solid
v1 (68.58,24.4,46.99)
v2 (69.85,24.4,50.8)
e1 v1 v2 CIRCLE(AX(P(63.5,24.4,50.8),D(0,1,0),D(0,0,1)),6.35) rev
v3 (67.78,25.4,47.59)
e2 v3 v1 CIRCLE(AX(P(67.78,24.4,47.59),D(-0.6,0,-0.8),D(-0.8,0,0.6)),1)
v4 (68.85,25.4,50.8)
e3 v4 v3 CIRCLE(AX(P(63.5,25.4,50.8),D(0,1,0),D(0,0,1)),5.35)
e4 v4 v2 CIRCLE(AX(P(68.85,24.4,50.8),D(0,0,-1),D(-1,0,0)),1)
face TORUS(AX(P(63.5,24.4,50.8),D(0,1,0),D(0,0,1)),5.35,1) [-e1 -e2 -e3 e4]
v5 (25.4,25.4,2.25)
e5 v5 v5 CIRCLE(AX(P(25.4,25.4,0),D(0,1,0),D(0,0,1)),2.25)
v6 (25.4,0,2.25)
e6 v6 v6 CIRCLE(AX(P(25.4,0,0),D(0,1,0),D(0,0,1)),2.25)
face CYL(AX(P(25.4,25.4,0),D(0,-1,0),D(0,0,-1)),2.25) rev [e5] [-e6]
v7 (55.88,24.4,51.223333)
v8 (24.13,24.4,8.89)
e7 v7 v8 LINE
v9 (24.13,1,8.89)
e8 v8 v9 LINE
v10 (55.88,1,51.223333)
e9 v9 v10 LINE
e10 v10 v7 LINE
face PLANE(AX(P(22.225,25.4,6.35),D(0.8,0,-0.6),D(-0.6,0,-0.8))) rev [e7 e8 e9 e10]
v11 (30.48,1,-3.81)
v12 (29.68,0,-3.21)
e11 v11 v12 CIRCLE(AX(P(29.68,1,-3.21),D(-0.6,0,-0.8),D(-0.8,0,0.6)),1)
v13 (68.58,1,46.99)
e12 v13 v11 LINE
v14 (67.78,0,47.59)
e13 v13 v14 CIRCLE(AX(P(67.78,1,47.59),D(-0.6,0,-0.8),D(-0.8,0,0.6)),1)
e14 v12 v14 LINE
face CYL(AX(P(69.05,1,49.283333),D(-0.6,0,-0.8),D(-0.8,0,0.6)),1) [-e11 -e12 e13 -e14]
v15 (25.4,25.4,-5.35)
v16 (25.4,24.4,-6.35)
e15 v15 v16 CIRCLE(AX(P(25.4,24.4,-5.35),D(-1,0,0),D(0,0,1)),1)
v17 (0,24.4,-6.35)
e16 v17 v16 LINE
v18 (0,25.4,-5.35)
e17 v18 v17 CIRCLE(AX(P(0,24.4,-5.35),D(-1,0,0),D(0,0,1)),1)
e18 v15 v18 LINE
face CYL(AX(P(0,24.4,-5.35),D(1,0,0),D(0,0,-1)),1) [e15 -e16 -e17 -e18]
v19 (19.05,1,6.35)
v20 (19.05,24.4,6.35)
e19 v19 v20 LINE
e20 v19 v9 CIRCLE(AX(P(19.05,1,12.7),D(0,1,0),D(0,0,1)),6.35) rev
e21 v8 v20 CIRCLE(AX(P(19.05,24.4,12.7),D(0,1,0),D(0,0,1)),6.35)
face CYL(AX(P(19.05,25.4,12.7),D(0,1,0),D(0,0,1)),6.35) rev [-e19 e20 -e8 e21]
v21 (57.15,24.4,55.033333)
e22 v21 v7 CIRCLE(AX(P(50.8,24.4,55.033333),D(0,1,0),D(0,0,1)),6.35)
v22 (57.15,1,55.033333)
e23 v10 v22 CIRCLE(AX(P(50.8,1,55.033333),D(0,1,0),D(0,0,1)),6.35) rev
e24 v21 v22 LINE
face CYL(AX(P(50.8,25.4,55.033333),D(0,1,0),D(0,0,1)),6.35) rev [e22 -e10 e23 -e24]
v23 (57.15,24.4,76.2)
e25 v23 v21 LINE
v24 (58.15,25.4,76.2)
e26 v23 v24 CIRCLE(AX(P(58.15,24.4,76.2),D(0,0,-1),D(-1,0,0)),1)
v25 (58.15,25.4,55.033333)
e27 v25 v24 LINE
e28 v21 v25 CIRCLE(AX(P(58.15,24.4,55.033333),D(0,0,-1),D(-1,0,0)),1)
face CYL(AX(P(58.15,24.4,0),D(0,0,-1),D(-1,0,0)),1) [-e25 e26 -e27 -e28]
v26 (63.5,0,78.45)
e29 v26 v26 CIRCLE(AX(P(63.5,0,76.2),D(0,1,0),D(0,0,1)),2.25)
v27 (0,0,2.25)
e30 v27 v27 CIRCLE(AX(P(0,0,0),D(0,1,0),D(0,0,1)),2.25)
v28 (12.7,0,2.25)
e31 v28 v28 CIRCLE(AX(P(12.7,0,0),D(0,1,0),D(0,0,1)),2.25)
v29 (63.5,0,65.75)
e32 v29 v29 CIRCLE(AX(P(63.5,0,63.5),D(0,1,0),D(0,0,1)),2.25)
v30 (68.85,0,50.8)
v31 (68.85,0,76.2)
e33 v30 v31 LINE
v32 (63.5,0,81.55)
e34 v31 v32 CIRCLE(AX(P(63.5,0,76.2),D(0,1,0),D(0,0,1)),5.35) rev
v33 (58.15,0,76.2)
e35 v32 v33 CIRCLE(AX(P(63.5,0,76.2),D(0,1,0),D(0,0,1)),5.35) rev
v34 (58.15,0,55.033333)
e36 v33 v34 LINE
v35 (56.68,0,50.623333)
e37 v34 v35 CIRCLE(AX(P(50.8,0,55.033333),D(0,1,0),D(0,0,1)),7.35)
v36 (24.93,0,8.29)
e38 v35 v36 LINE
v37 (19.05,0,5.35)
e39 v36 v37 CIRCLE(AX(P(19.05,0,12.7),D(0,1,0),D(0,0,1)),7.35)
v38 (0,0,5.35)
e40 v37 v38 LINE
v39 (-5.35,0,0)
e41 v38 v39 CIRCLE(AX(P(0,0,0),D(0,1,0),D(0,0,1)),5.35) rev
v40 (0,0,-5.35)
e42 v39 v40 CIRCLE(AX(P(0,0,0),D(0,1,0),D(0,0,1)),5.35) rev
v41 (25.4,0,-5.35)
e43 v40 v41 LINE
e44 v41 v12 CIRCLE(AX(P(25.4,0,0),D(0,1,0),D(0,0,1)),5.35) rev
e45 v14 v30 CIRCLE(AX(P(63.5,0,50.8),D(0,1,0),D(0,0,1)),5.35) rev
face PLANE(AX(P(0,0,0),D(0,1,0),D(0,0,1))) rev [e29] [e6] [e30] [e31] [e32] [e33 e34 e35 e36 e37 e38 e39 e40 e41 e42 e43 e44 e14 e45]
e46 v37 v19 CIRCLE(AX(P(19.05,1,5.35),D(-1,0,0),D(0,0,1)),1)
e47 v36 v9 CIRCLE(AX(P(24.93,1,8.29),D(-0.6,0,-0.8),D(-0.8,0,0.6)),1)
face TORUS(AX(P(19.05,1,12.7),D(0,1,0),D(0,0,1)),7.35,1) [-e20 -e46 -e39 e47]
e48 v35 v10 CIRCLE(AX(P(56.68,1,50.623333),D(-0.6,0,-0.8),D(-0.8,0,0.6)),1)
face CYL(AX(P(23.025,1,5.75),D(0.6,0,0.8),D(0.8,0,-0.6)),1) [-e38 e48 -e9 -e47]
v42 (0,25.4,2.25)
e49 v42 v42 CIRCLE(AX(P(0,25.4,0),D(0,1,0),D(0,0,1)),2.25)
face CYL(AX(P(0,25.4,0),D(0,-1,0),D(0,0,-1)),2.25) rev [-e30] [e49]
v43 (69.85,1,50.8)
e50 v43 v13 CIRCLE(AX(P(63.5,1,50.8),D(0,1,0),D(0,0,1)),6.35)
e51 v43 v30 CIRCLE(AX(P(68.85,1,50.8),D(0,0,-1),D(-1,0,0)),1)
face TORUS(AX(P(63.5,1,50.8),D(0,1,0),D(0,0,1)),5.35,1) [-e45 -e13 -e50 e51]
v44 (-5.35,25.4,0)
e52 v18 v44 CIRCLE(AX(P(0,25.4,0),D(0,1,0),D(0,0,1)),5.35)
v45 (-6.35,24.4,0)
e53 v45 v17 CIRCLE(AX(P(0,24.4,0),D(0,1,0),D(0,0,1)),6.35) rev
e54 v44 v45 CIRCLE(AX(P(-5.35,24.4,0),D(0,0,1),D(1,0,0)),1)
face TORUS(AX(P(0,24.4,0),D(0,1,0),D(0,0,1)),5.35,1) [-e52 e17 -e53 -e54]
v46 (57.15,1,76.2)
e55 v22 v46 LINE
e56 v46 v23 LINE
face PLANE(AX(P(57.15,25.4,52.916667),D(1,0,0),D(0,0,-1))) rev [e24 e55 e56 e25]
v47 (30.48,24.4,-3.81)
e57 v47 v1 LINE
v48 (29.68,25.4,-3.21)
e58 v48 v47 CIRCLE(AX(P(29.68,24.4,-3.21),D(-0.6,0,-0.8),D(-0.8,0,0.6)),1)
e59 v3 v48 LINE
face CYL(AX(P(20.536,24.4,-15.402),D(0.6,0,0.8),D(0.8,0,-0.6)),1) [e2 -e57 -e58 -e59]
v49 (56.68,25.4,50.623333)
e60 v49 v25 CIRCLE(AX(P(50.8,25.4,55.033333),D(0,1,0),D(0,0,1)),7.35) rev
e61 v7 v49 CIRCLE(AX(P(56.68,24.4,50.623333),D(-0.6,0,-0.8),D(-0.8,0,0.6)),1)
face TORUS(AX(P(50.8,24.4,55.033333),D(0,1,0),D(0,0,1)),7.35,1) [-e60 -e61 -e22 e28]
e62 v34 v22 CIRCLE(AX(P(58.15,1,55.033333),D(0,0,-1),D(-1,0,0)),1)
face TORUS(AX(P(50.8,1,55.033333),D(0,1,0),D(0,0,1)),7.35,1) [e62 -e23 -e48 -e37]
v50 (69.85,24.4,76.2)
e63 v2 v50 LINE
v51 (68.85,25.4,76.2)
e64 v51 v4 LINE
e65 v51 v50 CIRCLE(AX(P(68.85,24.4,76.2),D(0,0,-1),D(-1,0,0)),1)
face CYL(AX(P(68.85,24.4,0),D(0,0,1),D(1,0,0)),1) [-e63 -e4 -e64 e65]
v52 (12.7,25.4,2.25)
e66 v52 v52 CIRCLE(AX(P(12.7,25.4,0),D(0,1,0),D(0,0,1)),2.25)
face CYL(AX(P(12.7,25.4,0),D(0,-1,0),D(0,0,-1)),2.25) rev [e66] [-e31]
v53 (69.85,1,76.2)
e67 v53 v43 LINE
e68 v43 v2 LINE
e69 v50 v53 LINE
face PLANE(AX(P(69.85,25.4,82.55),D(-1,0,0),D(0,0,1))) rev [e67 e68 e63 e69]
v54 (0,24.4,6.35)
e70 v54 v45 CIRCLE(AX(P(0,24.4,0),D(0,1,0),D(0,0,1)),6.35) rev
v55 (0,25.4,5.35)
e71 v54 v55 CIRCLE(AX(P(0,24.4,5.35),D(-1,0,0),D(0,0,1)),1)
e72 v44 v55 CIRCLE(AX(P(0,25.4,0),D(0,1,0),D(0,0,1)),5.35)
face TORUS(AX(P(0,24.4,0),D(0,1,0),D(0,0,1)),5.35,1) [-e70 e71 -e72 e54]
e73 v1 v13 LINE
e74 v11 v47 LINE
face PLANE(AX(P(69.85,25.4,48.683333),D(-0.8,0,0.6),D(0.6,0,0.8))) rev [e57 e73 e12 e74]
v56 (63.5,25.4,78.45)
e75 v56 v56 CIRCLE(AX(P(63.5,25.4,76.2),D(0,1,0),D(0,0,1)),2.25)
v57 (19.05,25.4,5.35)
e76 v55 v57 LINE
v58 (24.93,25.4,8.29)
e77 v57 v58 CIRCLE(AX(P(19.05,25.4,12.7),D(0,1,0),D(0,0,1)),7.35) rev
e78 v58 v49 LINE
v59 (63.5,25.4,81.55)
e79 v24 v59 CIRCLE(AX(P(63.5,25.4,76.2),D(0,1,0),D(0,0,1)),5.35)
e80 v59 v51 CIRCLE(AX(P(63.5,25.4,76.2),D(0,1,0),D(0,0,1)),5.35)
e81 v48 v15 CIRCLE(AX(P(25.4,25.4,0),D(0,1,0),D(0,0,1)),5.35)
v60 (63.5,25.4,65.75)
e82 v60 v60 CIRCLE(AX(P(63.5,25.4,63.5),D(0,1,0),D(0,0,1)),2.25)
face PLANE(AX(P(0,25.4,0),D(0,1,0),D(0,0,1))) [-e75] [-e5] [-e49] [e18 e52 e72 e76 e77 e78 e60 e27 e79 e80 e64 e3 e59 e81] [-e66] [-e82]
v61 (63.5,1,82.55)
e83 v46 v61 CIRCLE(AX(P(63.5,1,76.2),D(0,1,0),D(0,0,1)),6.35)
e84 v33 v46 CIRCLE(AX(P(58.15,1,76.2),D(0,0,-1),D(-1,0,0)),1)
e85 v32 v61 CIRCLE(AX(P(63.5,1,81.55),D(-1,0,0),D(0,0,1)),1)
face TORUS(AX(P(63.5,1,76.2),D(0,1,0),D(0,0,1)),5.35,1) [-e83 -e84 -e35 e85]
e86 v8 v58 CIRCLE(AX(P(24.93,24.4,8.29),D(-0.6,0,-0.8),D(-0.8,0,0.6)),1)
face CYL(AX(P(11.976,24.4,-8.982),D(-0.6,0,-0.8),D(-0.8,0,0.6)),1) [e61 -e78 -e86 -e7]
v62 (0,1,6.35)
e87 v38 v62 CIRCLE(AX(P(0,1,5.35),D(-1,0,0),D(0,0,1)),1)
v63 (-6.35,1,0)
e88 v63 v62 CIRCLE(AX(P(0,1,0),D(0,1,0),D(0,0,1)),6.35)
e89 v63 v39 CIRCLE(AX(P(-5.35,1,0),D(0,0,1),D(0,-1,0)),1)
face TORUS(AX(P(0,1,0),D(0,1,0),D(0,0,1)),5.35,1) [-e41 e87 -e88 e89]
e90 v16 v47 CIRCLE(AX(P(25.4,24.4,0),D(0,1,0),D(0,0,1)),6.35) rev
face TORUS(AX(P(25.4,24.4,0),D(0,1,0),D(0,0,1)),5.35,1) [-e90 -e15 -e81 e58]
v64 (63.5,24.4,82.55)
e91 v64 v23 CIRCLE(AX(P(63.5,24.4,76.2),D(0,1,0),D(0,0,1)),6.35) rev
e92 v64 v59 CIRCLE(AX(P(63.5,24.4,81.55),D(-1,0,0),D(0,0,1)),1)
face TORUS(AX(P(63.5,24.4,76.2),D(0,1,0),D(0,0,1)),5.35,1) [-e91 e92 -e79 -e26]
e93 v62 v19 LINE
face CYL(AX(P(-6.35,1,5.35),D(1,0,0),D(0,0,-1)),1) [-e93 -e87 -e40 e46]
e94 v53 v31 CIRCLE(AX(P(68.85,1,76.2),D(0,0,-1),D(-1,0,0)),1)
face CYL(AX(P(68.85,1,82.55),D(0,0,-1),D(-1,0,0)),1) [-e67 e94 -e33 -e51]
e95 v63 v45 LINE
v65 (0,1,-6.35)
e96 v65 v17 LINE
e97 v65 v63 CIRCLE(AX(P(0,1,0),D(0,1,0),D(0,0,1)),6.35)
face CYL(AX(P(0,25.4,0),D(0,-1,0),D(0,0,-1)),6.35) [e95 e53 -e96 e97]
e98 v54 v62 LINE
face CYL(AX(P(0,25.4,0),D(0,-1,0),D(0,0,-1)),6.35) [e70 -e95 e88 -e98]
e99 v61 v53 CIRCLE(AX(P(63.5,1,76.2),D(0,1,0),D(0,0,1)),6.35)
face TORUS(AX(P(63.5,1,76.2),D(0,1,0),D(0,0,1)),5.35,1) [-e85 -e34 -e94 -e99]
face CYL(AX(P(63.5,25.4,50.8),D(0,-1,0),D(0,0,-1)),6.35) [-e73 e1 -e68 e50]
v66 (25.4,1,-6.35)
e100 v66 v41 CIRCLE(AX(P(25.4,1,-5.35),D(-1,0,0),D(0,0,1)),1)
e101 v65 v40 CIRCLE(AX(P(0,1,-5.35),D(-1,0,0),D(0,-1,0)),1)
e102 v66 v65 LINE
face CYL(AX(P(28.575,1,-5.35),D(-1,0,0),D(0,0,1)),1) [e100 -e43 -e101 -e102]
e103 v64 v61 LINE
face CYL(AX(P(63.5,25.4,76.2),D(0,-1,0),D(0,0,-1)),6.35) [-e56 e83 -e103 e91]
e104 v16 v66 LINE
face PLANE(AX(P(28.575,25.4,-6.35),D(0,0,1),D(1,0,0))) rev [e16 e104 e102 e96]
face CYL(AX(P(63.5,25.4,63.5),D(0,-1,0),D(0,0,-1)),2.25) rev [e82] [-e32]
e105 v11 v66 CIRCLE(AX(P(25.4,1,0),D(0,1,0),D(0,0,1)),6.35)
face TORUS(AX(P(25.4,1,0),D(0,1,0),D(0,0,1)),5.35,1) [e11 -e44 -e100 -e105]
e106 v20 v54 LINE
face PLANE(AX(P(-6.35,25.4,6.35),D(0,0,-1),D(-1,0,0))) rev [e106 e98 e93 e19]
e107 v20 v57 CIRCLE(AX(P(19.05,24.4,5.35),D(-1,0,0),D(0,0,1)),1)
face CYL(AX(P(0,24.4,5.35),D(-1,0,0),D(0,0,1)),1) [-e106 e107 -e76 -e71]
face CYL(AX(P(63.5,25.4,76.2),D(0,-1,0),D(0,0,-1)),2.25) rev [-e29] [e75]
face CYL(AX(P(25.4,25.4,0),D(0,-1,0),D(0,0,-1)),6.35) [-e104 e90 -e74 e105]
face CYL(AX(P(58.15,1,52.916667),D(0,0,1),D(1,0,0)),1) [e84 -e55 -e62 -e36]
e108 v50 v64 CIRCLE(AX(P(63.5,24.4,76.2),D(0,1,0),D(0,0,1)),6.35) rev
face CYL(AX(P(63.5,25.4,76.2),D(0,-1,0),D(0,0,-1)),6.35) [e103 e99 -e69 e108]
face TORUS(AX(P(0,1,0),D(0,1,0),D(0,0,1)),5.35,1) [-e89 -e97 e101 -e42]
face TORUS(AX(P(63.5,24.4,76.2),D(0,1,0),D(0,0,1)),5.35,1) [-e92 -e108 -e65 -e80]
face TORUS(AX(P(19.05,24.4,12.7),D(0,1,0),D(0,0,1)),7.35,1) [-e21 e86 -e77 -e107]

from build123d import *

# Parameters (mm, degrees)
SKETCH1_R           = 2.25
BOSS_EXTRUDE1_DEPTH = 25.4
FILLET1_R           = 6.35
FILLET2_R           = 1


with BuildPart() as part:
    # Sketch1 → Boss-Extrude1 (new body)
    with BuildSketch(Plane(origin=(0, 0, 0), x_dir=(1, 0, 0), z_dir=(0, 1, 0))):
        Polygon((-6.35, 6.35), (-6.35, -6.35), (22.225, -6.35), (57.15, -52.916666667), (57.15, -82.55), (69.85, -82.55), (69.85, -48.683333333), (28.575, 6.35), align=None)
        with Locations(Location((0, 0, 0), (0, 0, 270))):
            Circle(SKETCH1_R, mode=Mode.SUBTRACT)
        with Locations(Location((63.5, -76.2, 0), (0, 0, 270))):
            Circle(SKETCH1_R, mode=Mode.SUBTRACT)
        with Locations(Location((63.5, -63.5, 0), (0, 0, 270))):
            Circle(SKETCH1_R, mode=Mode.SUBTRACT)
        with Locations(Location((12.7, 0, 0), (0, 0, 270))):
            Circle(SKETCH1_R, mode=Mode.SUBTRACT)
        with Locations(Location((25.4, 0, 0), (0, 0, 270))):
            Circle(SKETCH1_R, mode=Mode.SUBTRACT)
    extrude(amount=BOSS_EXTRUDE1_DEPTH)

    # Fillet1
    fillet1_edges = [part.edges().sort_by_distance(p)[0] for p in [
        (28.575, 12.7, -6.35),
        (22.225, 12.7, 6.35),
        (69.85, 12.7, 48.683333333),
        (57.15, 12.7, 52.916666667),
        (69.85, 12.7, 82.55),
        (57.15, 12.7, 82.55),
        (-6.35, 12.7, -6.35),
        (-6.35, 12.7, 6.35),
    ]]
    fillet(fillet1_edges, radius=FILLET1_R - 0.0001)  # a hair under: the kernel refuses the full size

    # Fillet2
    fillet2_edges = [part.edges().sort_by_distance(p)[0] for p in [
        (12.699975, 0, -6.35),
        (12.699975, 25.4, -6.35),
        (49.529995, 0, 21.589993333),
        (69.85, 0, 63.500033333),
        (57.15, 0, 65.6167),
        (40.004995, 0, 30.05666),
        (9.524975, 0, 6.35),
        (-4.49015735, 0, 4.49015735),
        (-4.49015735, 0, -4.49015735),
        (59.00984265, 0, 80.69015735),
        (67.99015735, 0, 80.69015735),
        (69.524144074, 0, 48.791951975),
        (28.23981161, 0, -5.67962322),
        (49.529995, 25.4, 21.589993333),
        (9.524975, 25.4, 6.35),
        (40.004995, 25.4, 30.05666),
        (57.15, 25.4, 65.6167),
        (69.85, 25.4, 63.500033333),
        (-4.49015735, 25.4, 4.49015735),
        (-4.49015735, 25.4, -4.49015735),
        (59.00984265, 25.4, 80.69015735),
        (67.99015735, 25.4, 80.69015735),
        (69.524144074, 25.4, 48.791951975),
        (28.23981161, 25.4, -5.67962322),
        (21.88981161, 0, 7.02037678),
        (21.88981161, 25.4, 7.02037678),
        (56.824144074, 0, 53.025285309),
        (56.824144074, 25.4, 53.025285309),
    ]]
    fillet(fillet2_edges, radius=FILLET2_R)


solid = part.part
